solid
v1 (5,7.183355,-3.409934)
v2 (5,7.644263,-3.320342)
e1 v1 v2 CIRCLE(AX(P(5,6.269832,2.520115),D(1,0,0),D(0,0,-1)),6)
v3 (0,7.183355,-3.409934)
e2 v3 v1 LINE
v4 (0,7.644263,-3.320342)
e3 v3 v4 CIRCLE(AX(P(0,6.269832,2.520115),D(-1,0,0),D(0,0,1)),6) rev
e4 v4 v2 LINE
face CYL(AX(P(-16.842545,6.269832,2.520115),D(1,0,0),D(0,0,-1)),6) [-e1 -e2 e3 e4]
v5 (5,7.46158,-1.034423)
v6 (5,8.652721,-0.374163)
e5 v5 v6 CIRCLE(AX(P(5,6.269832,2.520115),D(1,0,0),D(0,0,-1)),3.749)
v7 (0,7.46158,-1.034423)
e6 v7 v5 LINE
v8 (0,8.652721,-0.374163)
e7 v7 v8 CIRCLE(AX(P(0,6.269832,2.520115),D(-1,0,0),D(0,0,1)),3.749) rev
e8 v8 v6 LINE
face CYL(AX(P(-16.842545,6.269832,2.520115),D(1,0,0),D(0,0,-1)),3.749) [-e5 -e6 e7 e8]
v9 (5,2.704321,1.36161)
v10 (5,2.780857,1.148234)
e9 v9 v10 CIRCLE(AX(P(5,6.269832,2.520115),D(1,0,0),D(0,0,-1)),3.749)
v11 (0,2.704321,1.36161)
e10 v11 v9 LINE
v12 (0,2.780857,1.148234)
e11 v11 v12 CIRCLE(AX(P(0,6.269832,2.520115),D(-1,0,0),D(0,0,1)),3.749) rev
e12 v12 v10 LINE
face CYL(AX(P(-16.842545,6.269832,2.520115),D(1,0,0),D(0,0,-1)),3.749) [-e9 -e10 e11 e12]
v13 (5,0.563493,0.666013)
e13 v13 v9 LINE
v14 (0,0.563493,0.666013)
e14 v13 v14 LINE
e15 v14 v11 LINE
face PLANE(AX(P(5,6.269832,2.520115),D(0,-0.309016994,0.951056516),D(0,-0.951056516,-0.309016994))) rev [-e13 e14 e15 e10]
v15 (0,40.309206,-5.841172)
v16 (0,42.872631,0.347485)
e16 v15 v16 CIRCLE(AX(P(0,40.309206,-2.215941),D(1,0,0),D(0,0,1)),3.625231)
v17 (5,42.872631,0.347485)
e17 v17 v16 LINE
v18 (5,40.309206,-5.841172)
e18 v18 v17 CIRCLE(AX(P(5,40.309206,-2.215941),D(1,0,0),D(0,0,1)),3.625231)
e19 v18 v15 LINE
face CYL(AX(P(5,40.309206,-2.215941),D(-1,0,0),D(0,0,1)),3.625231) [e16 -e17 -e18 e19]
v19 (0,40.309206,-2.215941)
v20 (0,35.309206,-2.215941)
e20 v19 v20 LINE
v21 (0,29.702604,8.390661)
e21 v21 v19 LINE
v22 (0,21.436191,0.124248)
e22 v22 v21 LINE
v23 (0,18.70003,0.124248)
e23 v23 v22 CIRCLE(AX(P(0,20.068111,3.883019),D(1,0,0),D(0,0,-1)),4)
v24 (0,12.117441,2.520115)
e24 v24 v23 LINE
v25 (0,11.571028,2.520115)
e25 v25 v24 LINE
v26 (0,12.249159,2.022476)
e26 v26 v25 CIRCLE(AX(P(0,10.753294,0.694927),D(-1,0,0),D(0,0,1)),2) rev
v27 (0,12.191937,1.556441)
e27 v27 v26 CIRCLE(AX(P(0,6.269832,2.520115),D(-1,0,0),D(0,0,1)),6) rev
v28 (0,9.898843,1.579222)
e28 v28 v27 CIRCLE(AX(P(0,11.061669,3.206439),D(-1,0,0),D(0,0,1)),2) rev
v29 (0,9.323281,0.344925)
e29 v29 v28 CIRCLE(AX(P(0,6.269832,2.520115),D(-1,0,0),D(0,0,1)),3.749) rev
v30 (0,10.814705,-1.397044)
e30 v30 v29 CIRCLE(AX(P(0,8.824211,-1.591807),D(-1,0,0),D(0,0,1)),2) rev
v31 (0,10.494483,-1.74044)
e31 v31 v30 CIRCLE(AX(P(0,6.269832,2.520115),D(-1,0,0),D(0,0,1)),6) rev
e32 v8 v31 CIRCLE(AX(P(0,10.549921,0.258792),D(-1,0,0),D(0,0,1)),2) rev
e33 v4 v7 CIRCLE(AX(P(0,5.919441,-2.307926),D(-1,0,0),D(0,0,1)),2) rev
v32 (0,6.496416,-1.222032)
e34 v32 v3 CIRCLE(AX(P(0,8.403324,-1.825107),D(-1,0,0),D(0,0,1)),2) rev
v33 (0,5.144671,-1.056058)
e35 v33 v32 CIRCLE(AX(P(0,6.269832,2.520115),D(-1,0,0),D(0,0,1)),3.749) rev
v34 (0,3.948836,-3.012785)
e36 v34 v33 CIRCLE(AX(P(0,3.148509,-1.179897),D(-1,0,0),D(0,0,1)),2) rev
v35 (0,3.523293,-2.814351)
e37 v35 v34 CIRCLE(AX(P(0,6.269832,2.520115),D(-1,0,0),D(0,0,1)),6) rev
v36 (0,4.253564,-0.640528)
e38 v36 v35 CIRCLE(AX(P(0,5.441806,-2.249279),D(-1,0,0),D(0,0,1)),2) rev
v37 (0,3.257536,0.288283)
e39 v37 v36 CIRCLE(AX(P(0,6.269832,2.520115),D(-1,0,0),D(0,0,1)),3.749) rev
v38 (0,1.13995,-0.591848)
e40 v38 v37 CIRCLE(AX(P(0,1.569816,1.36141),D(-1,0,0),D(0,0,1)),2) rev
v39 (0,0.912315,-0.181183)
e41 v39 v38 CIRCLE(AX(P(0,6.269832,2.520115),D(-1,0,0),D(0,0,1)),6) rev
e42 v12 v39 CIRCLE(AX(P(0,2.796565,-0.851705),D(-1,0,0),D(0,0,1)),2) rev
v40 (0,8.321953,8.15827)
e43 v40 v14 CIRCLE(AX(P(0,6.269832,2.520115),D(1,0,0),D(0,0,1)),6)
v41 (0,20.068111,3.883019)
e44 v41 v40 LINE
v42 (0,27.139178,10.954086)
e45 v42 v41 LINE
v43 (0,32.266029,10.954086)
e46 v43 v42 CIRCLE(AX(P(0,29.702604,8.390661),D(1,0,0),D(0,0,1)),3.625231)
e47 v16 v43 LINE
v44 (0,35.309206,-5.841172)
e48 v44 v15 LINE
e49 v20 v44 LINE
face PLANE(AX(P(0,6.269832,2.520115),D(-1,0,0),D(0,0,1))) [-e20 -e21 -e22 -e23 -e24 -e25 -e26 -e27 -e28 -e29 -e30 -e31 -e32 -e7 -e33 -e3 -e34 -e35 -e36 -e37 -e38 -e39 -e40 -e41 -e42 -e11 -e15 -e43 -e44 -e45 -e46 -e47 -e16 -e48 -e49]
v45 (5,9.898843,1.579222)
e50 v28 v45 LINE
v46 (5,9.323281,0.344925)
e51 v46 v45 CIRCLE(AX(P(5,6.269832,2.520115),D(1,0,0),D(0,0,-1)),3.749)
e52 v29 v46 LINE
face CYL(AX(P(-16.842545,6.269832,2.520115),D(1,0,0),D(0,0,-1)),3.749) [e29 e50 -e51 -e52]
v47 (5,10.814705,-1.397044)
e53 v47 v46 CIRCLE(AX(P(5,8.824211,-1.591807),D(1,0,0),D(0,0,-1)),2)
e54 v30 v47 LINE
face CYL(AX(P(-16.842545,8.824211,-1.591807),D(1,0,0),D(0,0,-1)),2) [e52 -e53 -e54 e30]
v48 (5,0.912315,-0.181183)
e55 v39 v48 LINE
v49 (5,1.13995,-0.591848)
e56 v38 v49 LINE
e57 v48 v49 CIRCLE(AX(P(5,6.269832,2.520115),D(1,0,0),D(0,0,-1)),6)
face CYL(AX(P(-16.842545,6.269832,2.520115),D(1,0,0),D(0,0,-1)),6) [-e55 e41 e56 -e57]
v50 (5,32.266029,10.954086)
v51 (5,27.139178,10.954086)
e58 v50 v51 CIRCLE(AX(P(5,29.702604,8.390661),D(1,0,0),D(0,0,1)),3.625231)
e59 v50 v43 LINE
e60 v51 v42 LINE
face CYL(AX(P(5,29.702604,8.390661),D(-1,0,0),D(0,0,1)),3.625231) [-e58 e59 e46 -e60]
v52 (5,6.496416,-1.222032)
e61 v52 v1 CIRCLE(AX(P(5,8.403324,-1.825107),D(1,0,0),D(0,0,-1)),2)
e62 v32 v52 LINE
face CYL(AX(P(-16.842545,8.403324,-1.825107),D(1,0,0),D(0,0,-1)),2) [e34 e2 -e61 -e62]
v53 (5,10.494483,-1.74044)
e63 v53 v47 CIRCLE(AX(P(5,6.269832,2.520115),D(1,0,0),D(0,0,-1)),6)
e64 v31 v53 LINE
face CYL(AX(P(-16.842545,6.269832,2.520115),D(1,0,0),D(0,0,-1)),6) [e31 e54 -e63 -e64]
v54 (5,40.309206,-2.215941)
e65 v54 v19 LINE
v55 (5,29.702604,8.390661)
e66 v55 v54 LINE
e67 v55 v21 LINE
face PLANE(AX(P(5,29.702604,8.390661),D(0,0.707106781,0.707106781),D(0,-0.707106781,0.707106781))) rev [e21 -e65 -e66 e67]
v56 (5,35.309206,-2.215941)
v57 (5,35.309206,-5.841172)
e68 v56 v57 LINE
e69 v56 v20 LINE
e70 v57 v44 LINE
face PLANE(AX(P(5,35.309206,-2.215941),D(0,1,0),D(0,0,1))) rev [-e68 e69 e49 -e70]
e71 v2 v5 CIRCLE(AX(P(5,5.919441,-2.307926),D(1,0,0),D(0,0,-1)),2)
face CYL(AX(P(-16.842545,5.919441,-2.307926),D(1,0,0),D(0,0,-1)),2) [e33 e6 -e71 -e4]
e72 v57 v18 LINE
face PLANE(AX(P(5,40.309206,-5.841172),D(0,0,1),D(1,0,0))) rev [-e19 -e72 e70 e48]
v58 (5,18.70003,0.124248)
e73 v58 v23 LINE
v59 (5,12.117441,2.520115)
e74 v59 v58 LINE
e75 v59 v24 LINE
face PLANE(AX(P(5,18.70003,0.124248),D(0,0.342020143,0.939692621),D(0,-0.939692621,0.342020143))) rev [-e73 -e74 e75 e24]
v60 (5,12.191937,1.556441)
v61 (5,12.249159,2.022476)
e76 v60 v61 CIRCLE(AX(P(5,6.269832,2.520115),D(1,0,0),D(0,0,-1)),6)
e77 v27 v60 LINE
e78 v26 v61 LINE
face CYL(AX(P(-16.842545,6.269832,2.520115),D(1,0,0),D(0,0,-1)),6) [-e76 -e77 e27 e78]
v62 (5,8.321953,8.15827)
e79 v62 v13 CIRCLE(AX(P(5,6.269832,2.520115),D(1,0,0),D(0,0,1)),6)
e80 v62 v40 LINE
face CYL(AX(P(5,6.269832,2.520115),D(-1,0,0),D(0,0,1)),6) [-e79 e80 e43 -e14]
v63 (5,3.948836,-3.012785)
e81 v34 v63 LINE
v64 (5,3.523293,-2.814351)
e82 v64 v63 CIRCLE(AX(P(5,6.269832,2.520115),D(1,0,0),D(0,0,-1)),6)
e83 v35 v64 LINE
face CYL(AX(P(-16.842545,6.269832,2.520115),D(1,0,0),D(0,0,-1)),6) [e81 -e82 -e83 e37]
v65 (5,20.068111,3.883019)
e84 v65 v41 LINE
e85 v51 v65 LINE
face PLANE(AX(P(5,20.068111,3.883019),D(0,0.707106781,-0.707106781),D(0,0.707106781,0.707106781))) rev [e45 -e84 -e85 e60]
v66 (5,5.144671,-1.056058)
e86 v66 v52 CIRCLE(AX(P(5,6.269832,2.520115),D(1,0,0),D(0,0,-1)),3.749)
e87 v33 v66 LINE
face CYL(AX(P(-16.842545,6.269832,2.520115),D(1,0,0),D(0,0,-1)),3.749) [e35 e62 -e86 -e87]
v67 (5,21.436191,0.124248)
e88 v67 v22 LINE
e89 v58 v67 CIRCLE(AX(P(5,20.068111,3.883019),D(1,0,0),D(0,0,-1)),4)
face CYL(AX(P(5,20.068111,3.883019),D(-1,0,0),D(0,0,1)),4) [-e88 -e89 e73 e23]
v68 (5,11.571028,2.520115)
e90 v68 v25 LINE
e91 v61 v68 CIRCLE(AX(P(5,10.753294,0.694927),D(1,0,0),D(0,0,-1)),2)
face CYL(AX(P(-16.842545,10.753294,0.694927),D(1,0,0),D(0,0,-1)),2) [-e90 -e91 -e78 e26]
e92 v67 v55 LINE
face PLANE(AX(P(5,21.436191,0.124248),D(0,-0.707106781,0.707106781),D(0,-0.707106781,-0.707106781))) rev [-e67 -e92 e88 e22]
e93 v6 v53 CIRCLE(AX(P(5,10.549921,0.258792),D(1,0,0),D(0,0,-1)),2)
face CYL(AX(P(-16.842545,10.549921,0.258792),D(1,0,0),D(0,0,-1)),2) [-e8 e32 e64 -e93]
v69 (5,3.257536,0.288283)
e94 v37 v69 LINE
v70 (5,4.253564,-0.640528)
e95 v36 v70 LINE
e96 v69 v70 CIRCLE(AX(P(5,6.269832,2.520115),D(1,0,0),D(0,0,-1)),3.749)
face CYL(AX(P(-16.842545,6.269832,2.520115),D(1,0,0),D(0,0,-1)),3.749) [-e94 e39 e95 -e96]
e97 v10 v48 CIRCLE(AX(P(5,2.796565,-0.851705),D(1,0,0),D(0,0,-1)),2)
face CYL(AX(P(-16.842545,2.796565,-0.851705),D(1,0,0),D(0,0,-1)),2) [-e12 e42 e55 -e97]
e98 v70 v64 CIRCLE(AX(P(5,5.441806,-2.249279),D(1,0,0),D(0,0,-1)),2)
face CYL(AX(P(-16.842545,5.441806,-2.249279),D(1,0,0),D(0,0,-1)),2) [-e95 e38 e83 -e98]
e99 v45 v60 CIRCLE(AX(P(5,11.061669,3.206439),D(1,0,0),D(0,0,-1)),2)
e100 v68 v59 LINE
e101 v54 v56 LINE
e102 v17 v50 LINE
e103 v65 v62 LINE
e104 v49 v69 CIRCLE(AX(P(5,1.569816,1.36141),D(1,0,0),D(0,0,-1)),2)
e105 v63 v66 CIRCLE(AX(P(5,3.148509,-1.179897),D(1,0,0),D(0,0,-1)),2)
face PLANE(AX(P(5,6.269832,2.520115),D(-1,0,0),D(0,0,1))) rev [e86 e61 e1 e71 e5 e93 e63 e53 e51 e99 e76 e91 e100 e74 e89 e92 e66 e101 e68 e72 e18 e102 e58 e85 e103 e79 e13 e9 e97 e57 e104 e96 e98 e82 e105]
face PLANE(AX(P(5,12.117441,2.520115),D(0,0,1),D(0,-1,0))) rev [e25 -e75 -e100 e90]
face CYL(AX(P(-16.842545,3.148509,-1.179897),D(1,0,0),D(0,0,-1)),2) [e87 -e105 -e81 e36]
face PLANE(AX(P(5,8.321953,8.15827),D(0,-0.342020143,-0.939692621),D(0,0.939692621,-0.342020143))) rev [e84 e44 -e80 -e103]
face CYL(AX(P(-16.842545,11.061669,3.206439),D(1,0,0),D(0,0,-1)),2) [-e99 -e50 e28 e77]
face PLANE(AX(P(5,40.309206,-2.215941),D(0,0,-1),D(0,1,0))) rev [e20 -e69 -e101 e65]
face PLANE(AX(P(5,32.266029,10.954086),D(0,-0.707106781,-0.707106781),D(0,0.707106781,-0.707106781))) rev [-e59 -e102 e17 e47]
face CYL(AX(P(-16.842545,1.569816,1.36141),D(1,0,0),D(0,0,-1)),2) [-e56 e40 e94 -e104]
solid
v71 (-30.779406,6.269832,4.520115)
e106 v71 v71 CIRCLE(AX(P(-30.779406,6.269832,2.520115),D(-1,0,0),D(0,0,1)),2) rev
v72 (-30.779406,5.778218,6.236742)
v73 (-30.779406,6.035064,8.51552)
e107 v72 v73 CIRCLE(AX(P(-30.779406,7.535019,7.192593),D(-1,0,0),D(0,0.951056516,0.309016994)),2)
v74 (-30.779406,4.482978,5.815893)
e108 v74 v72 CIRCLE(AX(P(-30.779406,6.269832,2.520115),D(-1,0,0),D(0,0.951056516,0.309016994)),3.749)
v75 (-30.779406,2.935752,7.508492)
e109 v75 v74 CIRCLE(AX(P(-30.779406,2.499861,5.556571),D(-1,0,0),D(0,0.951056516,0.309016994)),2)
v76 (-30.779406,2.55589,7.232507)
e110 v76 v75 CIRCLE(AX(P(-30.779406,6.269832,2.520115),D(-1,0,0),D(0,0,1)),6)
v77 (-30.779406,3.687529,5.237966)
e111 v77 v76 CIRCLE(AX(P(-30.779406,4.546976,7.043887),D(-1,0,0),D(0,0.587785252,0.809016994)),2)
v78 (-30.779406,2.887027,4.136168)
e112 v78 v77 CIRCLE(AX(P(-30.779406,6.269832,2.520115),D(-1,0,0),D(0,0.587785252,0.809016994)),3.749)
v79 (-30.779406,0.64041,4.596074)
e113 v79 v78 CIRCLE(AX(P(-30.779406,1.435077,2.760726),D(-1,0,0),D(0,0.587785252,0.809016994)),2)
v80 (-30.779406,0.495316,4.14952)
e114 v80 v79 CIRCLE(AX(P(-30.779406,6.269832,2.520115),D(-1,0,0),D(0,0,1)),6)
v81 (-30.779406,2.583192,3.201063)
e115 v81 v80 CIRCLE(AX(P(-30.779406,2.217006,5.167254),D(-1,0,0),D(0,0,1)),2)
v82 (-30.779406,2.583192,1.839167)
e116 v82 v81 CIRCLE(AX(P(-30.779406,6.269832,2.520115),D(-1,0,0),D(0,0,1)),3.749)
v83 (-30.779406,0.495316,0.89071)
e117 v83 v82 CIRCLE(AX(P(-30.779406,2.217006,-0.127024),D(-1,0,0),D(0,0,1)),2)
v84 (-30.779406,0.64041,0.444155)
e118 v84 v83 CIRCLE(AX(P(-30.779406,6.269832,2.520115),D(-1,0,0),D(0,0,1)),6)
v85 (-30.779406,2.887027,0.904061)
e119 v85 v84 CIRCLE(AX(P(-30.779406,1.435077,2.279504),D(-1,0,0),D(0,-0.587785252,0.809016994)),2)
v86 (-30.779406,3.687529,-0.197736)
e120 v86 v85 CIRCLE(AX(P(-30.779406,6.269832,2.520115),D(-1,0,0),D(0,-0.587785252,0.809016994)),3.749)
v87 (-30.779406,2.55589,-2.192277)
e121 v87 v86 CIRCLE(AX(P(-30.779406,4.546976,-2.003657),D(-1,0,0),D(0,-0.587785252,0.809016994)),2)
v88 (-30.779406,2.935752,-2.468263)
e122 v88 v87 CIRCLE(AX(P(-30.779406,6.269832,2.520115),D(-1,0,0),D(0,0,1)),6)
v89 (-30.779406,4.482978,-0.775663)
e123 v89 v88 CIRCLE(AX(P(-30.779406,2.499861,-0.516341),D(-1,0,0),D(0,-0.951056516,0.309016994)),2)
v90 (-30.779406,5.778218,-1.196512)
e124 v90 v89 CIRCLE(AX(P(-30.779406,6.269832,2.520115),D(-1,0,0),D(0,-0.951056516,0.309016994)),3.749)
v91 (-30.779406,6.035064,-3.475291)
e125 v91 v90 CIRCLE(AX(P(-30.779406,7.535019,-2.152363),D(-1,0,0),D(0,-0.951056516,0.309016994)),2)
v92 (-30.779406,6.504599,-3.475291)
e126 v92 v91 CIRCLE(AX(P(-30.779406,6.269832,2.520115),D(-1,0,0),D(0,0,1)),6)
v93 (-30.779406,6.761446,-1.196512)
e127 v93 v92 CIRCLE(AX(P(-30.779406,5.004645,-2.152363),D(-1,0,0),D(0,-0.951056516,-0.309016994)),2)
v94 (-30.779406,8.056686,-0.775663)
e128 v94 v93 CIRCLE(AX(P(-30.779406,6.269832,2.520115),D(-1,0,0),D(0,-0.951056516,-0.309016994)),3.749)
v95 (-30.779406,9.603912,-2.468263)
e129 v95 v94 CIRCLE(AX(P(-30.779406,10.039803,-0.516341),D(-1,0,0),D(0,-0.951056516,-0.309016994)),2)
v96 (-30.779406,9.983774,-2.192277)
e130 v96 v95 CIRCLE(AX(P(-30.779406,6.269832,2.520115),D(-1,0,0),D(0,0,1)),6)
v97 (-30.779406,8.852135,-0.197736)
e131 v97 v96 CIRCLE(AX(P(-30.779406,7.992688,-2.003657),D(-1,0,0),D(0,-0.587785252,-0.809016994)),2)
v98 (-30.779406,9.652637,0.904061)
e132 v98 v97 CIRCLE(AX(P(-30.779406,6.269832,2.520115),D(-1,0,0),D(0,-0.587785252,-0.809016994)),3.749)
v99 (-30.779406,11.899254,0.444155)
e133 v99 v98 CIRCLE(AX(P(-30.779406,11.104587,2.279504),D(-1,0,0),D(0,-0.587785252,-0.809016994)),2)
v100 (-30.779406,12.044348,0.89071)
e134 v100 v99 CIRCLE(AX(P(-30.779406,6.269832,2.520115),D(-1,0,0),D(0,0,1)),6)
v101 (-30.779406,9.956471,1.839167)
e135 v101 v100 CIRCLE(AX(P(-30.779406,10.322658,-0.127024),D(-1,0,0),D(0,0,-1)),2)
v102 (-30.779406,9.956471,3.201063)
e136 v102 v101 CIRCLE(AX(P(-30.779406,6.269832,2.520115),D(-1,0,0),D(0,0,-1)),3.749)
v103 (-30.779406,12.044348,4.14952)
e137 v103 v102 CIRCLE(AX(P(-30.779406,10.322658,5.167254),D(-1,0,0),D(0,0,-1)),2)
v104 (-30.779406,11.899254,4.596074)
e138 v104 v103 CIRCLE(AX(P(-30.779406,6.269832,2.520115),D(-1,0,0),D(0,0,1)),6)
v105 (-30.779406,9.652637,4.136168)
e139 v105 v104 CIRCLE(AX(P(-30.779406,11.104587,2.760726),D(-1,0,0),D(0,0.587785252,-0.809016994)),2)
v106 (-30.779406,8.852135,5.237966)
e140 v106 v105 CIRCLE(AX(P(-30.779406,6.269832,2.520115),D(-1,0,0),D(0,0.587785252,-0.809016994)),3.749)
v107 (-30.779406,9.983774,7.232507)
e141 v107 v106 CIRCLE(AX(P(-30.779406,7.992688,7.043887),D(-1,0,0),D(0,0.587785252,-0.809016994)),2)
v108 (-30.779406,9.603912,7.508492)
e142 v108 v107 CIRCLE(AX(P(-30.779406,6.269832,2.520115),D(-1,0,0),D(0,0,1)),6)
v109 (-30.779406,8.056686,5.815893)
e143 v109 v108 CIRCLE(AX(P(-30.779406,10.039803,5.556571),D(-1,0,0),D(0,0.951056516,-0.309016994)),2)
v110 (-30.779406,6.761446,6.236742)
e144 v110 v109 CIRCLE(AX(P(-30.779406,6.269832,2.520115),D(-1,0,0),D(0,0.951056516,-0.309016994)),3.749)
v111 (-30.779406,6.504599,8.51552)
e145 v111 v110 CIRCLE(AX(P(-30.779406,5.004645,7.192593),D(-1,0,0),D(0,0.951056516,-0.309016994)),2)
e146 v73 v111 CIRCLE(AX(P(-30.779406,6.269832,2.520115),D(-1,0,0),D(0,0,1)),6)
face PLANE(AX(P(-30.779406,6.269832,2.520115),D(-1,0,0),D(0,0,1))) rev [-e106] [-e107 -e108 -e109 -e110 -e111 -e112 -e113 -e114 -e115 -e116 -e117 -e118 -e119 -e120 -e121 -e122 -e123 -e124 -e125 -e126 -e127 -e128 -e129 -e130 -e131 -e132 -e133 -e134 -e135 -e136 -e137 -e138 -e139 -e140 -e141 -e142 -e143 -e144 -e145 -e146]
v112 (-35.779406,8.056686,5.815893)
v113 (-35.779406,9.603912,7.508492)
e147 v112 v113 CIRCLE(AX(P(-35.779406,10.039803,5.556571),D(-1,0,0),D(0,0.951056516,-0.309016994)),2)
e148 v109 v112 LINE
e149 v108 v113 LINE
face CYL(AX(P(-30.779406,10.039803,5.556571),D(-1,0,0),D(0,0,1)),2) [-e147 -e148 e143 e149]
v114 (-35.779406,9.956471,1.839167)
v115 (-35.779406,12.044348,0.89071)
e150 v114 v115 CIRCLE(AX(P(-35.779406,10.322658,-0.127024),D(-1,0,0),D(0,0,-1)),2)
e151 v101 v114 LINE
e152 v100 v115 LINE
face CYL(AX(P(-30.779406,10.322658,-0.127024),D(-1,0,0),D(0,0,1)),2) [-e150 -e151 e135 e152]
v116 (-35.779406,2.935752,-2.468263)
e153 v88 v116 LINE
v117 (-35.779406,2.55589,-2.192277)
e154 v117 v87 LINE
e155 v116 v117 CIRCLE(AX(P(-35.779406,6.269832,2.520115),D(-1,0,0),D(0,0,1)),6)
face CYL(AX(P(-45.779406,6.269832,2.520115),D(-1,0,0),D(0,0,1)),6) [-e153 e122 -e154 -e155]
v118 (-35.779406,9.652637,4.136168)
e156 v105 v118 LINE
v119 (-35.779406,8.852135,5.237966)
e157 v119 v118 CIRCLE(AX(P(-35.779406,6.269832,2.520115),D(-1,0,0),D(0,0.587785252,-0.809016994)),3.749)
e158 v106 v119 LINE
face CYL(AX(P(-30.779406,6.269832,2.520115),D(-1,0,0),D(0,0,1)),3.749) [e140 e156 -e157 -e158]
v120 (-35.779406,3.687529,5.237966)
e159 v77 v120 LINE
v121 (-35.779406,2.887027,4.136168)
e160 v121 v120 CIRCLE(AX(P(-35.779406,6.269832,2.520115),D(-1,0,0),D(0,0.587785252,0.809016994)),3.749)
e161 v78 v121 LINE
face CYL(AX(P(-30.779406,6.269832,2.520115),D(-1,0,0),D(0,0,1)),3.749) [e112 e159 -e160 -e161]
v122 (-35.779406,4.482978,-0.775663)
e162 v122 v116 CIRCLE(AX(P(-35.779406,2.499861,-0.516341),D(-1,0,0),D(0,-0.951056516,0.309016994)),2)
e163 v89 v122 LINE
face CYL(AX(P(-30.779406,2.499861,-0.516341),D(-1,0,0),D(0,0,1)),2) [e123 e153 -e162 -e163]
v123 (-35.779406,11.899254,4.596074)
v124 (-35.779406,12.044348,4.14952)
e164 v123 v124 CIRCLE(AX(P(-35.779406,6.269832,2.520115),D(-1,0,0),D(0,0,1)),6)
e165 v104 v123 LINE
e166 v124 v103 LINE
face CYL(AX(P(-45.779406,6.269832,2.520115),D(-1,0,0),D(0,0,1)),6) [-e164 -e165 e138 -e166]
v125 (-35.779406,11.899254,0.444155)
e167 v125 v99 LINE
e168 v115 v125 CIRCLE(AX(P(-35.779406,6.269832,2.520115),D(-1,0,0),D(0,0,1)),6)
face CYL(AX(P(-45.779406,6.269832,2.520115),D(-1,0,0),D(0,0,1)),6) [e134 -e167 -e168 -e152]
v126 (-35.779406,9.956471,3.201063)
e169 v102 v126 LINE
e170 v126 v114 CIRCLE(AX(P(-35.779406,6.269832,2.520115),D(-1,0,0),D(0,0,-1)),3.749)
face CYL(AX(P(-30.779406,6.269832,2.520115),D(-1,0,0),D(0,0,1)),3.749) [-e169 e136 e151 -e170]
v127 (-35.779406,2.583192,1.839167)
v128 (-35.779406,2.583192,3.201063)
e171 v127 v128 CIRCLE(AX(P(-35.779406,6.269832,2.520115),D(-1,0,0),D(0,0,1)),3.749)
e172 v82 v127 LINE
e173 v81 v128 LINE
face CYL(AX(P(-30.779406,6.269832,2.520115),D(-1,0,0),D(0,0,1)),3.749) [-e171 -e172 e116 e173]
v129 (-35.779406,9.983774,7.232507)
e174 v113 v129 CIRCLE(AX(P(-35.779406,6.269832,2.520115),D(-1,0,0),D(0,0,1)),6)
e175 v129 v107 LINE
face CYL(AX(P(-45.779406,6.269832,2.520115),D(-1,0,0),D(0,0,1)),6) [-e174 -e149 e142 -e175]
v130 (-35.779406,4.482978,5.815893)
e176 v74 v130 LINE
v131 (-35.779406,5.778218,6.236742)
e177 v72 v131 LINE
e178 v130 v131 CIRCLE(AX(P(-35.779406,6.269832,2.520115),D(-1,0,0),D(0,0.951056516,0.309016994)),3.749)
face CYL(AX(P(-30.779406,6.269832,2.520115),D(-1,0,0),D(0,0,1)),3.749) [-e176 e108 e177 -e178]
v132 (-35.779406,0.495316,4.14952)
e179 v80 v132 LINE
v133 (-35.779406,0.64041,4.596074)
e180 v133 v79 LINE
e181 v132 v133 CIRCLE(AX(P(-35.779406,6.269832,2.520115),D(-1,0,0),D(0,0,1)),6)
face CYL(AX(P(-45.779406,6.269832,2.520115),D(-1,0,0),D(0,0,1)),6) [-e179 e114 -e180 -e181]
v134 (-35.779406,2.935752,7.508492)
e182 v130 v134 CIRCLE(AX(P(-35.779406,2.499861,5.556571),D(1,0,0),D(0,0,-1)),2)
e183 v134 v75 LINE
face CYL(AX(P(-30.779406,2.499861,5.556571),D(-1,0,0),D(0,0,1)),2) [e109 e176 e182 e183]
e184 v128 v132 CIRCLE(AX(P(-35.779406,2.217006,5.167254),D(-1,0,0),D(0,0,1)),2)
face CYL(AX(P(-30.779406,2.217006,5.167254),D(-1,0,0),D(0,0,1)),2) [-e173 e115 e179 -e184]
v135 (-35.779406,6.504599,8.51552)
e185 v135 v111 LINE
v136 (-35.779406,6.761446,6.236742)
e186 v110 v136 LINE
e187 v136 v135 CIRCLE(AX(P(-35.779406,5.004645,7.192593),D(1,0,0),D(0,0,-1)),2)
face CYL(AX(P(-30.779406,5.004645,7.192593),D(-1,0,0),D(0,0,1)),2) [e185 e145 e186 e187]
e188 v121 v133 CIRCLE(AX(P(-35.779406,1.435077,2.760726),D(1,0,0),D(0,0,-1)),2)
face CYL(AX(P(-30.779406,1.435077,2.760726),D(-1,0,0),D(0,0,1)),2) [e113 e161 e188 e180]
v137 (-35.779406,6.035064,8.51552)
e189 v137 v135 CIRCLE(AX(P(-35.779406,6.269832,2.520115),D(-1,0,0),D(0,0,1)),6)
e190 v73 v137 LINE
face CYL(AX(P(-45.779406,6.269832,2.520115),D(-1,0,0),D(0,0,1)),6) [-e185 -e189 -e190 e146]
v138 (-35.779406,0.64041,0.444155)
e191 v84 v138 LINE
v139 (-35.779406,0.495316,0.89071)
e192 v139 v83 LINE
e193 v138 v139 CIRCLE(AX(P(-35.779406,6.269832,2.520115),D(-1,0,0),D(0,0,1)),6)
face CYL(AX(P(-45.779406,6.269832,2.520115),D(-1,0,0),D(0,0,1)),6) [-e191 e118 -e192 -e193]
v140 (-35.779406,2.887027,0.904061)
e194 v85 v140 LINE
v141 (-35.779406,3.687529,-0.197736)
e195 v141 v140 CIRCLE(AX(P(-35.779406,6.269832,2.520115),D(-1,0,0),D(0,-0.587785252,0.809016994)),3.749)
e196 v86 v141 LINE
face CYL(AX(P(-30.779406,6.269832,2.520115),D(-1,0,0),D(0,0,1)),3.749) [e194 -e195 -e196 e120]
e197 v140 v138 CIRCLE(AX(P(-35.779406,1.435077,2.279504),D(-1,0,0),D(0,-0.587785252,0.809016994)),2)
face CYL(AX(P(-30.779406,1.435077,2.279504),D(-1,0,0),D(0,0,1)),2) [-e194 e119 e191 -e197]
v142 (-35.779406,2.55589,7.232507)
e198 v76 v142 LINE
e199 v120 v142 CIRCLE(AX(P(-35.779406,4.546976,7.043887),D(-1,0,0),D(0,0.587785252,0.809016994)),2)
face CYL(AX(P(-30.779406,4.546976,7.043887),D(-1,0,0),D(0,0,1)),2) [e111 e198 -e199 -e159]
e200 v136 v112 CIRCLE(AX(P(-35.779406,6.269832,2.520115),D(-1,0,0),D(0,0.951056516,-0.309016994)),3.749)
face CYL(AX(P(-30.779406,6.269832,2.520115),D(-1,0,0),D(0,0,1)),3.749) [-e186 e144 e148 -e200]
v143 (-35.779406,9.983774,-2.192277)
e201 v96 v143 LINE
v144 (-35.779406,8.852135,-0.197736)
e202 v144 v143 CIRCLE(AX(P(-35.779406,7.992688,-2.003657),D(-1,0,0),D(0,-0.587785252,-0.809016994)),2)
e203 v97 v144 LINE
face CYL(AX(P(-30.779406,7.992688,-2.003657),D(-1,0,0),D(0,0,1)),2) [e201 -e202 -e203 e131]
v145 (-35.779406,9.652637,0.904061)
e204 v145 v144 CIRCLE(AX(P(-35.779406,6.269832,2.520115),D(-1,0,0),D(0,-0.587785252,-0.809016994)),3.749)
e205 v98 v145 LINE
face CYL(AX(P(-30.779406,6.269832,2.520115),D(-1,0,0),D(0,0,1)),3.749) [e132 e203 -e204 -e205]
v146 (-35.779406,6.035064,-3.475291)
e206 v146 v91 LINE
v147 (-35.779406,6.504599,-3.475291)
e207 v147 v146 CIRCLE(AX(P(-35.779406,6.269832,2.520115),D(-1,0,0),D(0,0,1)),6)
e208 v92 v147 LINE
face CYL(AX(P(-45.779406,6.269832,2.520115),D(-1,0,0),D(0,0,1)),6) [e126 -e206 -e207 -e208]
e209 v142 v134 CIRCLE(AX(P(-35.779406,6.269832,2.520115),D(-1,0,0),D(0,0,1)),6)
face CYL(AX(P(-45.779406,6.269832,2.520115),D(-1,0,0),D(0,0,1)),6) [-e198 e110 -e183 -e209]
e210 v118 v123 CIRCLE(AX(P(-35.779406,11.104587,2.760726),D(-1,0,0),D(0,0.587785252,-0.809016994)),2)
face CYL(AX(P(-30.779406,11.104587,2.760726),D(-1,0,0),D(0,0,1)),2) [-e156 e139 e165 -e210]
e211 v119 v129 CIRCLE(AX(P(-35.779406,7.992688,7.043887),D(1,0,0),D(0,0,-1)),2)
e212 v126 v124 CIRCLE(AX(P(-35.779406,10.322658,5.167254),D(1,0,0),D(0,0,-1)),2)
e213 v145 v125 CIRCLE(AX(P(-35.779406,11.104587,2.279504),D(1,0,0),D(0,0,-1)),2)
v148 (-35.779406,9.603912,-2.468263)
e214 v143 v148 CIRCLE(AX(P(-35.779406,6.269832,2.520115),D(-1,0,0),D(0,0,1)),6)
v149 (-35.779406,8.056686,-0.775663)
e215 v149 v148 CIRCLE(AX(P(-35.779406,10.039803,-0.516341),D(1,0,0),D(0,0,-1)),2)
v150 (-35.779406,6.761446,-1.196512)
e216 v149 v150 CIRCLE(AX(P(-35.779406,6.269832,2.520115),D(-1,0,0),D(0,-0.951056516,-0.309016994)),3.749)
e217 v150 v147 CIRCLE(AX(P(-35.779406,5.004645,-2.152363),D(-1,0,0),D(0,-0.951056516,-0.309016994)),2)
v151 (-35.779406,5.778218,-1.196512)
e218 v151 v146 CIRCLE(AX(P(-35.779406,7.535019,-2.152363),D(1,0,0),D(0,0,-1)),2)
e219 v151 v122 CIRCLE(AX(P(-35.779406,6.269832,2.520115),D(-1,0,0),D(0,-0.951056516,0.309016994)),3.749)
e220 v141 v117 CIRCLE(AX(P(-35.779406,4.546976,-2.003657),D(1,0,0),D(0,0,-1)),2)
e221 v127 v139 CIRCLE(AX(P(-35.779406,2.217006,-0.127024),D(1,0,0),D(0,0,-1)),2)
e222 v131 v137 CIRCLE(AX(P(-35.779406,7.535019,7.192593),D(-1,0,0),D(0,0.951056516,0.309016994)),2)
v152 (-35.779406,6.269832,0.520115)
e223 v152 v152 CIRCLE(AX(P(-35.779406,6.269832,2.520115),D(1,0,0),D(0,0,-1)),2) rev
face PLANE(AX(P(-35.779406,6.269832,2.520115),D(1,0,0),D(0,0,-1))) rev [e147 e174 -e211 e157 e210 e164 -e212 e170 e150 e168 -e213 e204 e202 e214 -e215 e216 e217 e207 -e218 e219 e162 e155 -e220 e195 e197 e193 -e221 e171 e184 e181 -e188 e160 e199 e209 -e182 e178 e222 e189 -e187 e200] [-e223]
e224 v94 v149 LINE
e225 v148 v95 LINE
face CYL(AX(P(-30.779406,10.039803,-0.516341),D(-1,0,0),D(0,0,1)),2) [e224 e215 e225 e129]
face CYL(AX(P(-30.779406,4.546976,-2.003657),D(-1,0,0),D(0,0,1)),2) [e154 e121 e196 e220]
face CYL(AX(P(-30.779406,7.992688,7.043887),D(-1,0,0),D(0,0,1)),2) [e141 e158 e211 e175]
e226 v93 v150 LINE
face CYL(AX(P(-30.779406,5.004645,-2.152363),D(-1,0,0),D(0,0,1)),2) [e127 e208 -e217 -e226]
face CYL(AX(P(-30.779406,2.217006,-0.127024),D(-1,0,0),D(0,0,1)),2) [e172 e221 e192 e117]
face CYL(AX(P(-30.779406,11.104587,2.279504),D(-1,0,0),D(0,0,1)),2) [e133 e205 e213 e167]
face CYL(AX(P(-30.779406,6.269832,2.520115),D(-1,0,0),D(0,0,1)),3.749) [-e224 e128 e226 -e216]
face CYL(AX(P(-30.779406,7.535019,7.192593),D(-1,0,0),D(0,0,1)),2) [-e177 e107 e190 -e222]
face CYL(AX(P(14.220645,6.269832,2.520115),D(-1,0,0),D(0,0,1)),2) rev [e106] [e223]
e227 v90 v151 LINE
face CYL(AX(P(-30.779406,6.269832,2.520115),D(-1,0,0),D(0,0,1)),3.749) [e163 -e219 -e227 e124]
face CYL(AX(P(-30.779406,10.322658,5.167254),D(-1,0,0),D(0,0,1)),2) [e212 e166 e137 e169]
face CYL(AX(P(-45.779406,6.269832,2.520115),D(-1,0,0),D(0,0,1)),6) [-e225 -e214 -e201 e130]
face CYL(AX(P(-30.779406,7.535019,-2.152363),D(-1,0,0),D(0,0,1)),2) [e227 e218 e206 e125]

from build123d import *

# Parameters (mm, degrees)
SPUR_START             = -35.779405604
SPUR_GEAR_AM_OUTLINE_R = 2
SPUR_GEAR_AM_DEPTH     = 5
BOSS_EXTRUDE1_DEPTH    = 5
CUT_EXTRUDE1_START     = -5
SKETCH2_R              = 2
CUT_EXTRUDE1_DEPTH     = 5
BOSS_EXTRUDE4_START    = -5
BOSS_EXTRUDE4_DEPTH    = 5


# Read off the part's stored shape, not the designer's step: spur gear_am
with BuildPart() as part:
    # spur gear_am outline → spur gear_am (new body)
    with BuildSketch(Plane.YZ.offset(SPUR_START)):
        with BuildLine():
            ThreePointArc((6.035064372, -3.475290544), (6.269831909, -3.479885286), (6.504599445, -3.475290544))
            ThreePointArc((6.504599445, -3.475290544), (6.992060826, -2.376369483), (6.761446014, -1.196512329))
            ThreePointArc((6.761446014, -1.196512329), (7.42833662, -1.045396166), (8.056686306, -0.775663247))
            ThreePointArc((8.056686306, -0.775663247), (8.56361764, -1.865739721), (9.603911774, -2.468262924))
            ThreePointArc((9.603911774, -2.468262924), (9.796543422, -2.333987253), (9.983773627, -2.192277133))
            ThreePointArc((9.983773627, -2.192277133), (9.732208576, -1.016708708), (8.852134639, -0.197736204))
            ThreePointArc((8.852134639, -0.197736204), (9.302836621, 0.316507803), (9.652637162, 0.904060997))
            ThreePointArc((9.652637162, 0.904060997), (10.703484101, 0.320137366), (11.899253988, 0.444155406))
            ThreePointArc((11.899253988, 0.444155406), (11.976171006, 0.666012748), (12.044348305, 0.890709796))
            ThreePointArc((12.044348305, 0.890709796), (11.14984612, 1.693898402), (9.956471389, 1.839166595))
            ThreePointArc((9.956471389, 1.839166595), (10.018831909, 2.520114714), (9.956471389, 3.201062833))
            ThreePointArc((9.956471389, 3.201062833), (11.14984612, 3.346331025), (12.044348305, 4.149519631))
            ThreePointArc((12.044348305, 4.149519631), (11.976171006, 4.37421668), (11.899253988, 4.596074022))
            ThreePointArc((11.899253988, 4.596074022), (10.703484101, 4.720092061), (9.652637162, 4.13616843))
            ThreePointArc((9.652637162, 4.13616843), (9.302836621, 4.723721624), (8.852134639, 5.237965631))
            ThreePointArc((8.852134639, 5.237965631), (9.732208576, 6.056938135), (9.983773627, 7.23250656))
            ThreePointArc((9.983773627, 7.23250656), (9.796543422, 7.37421668), (9.603911774, 7.508492351))
            ThreePointArc((9.603911774, 7.508492351), (8.56361764, 6.905969148), (8.056686306, 5.815892674))
            ThreePointArc((8.056686306, 5.815892674), (7.42833662, 6.085625593), (6.761446014, 6.236741756))
            ThreePointArc((6.761446014, 6.236741756), (6.992060826, 7.41659891), (6.504599445, 8.515519971))
            ThreePointArc((6.504599445, 8.515519971), (6.269831909, 8.520114714), (6.035064372, 8.515519971))
            ThreePointArc((6.035064372, 8.515519971), (5.547602991, 7.41659891), (5.778217803, 6.236741756))
            ThreePointArc((5.778217803, 6.236741756), (5.111327197, 6.085625593), (4.482977511, 5.815892674))
            ThreePointArc((4.482977511, 5.815892674), (3.976046178, 6.905969148), (2.935752043, 7.508492351))
            ThreePointArc((2.935752043, 7.508492351), (2.743120395, 7.37421668), (2.55589019, 7.23250656))
            ThreePointArc((2.55589019, 7.23250656), (2.807455242, 6.056938135), (3.687529179, 5.237965631))
            ThreePointArc((3.687529179, 5.237965631), (3.236827197, 4.723721624), (2.887026655, 4.13616843))
            ThreePointArc((2.887026655, 4.13616843), (1.836179716, 4.720092061), (0.640409829, 4.596074022))
            ThreePointArc((0.640409829, 4.596074022), (0.563492811, 4.37421668), (0.495315512, 4.149519631))
            ThreePointArc((0.495315512, 4.149519631), (1.389817697, 3.346331025), (2.583192428, 3.201062833))
            ThreePointArc((2.583192428, 3.201062833), (2.520831909, 2.520114714), (2.583192428, 1.839166595))
            ThreePointArc((2.583192428, 1.839166595), (1.389817697, 1.693898402), (0.495315512, 0.890709796))
            ThreePointArc((0.495315512, 0.890709796), (0.563492811, 0.666012748), (0.640409829, 0.444155406))
            ThreePointArc((0.640409829, 0.444155406), (1.836179716, 0.320137366), (2.887026655, 0.904060997))
            ThreePointArc((2.887026655, 0.904060997), (3.236827197, 0.316507803), (3.687529179, -0.197736204))
            ThreePointArc((3.687529179, -0.197736204), (2.807455242, -1.016708708), (2.55589019, -2.192277133))
            ThreePointArc((2.55589019, -2.192277133), (2.743120395, -2.333987253), (2.935752043, -2.468262924))
            ThreePointArc((2.935752043, -2.468262924), (3.976046178, -1.865739721), (4.482977511, -0.775663247))
            ThreePointArc((4.482977511, -0.775663247), (5.111327197, -1.045396166), (5.778217803, -1.196512329))
            ThreePointArc((5.778217803, -1.196512329), (5.547602991, -2.376369483), (6.035064372, -3.475290544))
        make_face()
        with Locations((6.269831909, 2.520114714)):
            Circle(SPUR_GEAR_AM_OUTLINE_R, mode=Mode.SUBTRACT)
    extrude(amount=SPUR_GEAR_AM_DEPTH)


with BuildPart() as body_2:
    # Sketch1 → Boss-Extrude1 (new body)
    with BuildSketch(Plane(origin=(0, 0, 0), x_dir=(0, 0, -1), z_dir=(1, 0, 0))):
        with BuildLine():
            Line((-2.520114714, 12.117440709), (-2.520114714, 6.269831909))
            Line((-2.520114714, 6.269831909), (-0.666012747, 0.563492811))
            ThreePointArc((-0.666012747, 0.563492811), (-6.836153516, 2.101881686), (-8.158270438, 8.321952769))
            Line((-8.158270438, 8.321952769), (-3.883018647, 20.068110528))
            Line((-3.883018647, 20.068110528), (-10.954086459, 27.13917834))
            ThreePointArc((-10.954086459, 27.13917834), (-12.015892078, 29.702603869), (-10.954086459, 32.266029397))
            Line((-10.954086459, 32.266029397), (-0.347484741, 42.872631115))
            ThreePointArc((-0.347484741, 42.872631115), (3.603256686, 43.658482445), (5.841171936, 40.309205586))
            Line((5.841171936, 40.309205586), (5.841171936, 35.309205586))
            Line((5.841171936, 35.309205586), (2.215940787, 35.309205586))
            Line((2.215940787, 35.309205586), (2.215940787, 40.309205586))
            Line((2.215940787, 40.309205586), (-8.39066093, 29.702603869))
            Line((-8.39066093, 29.702603869), (-0.124248164, 21.436191102))
            ThreePointArc((-0.124248164, 21.436191102), (0.116981353, 20.068110528), (-0.124248164, 18.700029955))
            Line((-0.124248164, 18.700029955), (-2.520114714, 12.117440709))
        make_face()
    extrude(amount=BOSS_EXTRUDE1_DEPTH)

    # Sketch2 → Cut-Extrude1 (cut)
    with BuildSketch(Plane(origin=(5, 0, 0), x_dir=(0, 0, -1), z_dir=(1, 0, 0)).offset(CUT_EXTRUDE1_START)):
        with Locations(Location((-2.520114714, 6.269831909, 0), (0, 0, 180))):
            Circle(SKETCH2_R)
    extrude(amount=CUT_EXTRUDE1_DEPTH, mode=Mode.SUBTRACT)

    # Sketch5 → Boss-Extrude4 (add)
    with BuildSketch(Plane(origin=(5, 0, 0), x_dir=(0, 0, -1), z_dir=(1, 0, 0)).offset(BOSS_EXTRUDE4_START)):
        with BuildLine():
            ThreePointArc((3.320342305, 7.644263358), (2.148599503, 7.913084677), (1.034423028, 7.461579551))
            ThreePointArc((1.034423028, 7.461579551), (0.758834569, 8.087383175), (0.37416263, 8.65272084))
            ThreePointArc((0.37416263, 8.65272084), (1.347484271, 9.358334814), (1.740439947, 10.494482662))
            ThreePointArc((1.740439947, 10.494482662), (1.571875447, 10.657954118), (1.397043733, 10.814704811))
            ThreePointArc((1.397043733, 10.814704811), (0.291074687, 10.343452688), (-0.344924962, 9.323280867))
            ThreePointArc((-0.344924962, 9.323280867), (-0.93571885, 9.667579802), (-1.579222127, 9.898843088))
            ThreePointArc((-1.579222127, 9.898843088), (-1.206537867, 11.041800891), (-1.556440997, 12.191937359))
            ThreePointArc((-1.556440997, 12.191937359), (-1.788898653, 12.225108819), (-2.022476226, 12.24915929))
            ThreePointArc((-2.022476226, 12.24915929), (-2.640228932, 11.217836019), (-2.555121505, 10.018668465))
            ThreePointArc((-2.555121505, 10.018668465), (-3.235457637, 9.949952219), (-3.891995873, 9.758806412))
            ThreePointArc((-3.891995873, 9.758806412), (-4.262301713, 10.90253701), (-5.221412546, 11.627349059))
            ThreePointArc((-5.221412546, 11.627349059), (-5.428972435, 11.517550152), (-5.632077174, 11.399713939))
            ThreePointArc((-5.632077174, 11.399713939), (-5.525653002, 10.202249956), (-4.751946644, 9.282127916))
            ThreePointArc((-4.751946644, 9.282127916), (-5.261959741, 8.826643761), (-5.680757645, 8.286100061))
            ThreePointArc((-5.680757645, 8.286100061), (-6.65260934, 8.99373724), (-7.854580137, 9.016371303))
            ThreePointArc((-7.854580137, 9.016371303), (-7.957961436, 8.805541479), (-8.053014233, 8.590828011))
            ThreePointArc((-8.053014233, 8.590828011), (-7.2630636, 7.684613857), (-6.096287842, 7.394992676))
            ThreePointArc((-6.096287842, 7.394992676), (-6.241170236, 6.726720077), (-6.262261243, 6.043247807))
            ThreePointArc((-6.262261243, 6.043247807), (-7.464444479, 6.044498216), (-8.450163248, 5.35630885))
            ThreePointArc((-8.450163248, 5.35630885), (-8.409877814, 5.124977936), (-8.360571733, 4.895400459))
            ThreePointArc((-8.360571733, 4.895400459), (-7.18882893, 4.62657914), (-6.074652455, 5.078084267))
            ThreePointArc((-6.074652455, 5.078084267), (-5.799063996, 4.452280642), (-5.414392057, 3.886942978))
            ThreePointArc((-5.414392057, 3.886942978), (-6.387713698, 3.181329004), (-6.780669374, 2.045181156))
            ThreePointArc((-6.780669374, 2.045181156), (-6.612104874, 1.881709699), (-6.43727316, 1.724959006))
            ThreePointArc((-6.43727316, 1.724959006), (-5.331304114, 2.196211129), (-4.695304465, 3.21638295))
            ThreePointArc((-4.695304465, 3.21638295), (-4.104510577, 2.872084015), (-3.4610073, 2.640820729))
            ThreePointArc((-3.4610073, 2.640820729), (-3.83369156, 1.497862927), (-3.48378843, 0.347726458))
            ThreePointArc((-3.48378843, 0.347726458), (-3.251330774, 0.314554999), (-3.017753201, 0.290504527))
            ThreePointArc((-3.017753201, 0.290504527), (-2.400000495, 1.321827799), (-2.485107922, 2.520995353))
            ThreePointArc((-2.485107922, 2.520995353), (-1.80477179, 2.589711598), (-1.148233554, 2.780857406))
            ThreePointArc((-1.148233554, 2.780857406), (-0.777927714, 1.637126807), (0.181183119, 0.912314758))
            ThreePointArc((0.181183119, 0.912314758), (0.388743008, 1.022113666), (0.591847747, 1.139949878))
            ThreePointArc((0.591847747, 1.139949878), (0.485423575, 2.337413862), (-0.288282783, 3.257535901))
            ThreePointArc((-0.288282783, 3.257535901), (0.221730314, 3.713020057), (0.640528217, 4.253563756))
            ThreePointArc((0.640528217, 4.253563756), (1.612379913, 3.545926577), (2.81435071, 3.523292514))
            ThreePointArc((2.81435071, 3.523292514), (2.917732009, 3.734122338), (3.012784806, 3.948835807))
            ThreePointArc((3.012784806, 3.948835807), (2.222834173, 4.855049961), (1.056058415, 5.144671141))
            ThreePointArc((1.056058415, 5.144671141), (1.200940809, 5.81294374), (1.222031815, 6.496416011))
            ThreePointArc((1.222031815, 6.496416011), (2.424215051, 6.495165601), (3.409933821, 7.183354967))
            ThreePointArc((3.409933821, 7.183354967), (3.369648387, 7.414685881), (3.320342305, 7.644263358))
        make_face()
    extrude(amount=BOSS_EXTRUDE4_DEPTH)


solid = Compound([part.part, body_2.part])
